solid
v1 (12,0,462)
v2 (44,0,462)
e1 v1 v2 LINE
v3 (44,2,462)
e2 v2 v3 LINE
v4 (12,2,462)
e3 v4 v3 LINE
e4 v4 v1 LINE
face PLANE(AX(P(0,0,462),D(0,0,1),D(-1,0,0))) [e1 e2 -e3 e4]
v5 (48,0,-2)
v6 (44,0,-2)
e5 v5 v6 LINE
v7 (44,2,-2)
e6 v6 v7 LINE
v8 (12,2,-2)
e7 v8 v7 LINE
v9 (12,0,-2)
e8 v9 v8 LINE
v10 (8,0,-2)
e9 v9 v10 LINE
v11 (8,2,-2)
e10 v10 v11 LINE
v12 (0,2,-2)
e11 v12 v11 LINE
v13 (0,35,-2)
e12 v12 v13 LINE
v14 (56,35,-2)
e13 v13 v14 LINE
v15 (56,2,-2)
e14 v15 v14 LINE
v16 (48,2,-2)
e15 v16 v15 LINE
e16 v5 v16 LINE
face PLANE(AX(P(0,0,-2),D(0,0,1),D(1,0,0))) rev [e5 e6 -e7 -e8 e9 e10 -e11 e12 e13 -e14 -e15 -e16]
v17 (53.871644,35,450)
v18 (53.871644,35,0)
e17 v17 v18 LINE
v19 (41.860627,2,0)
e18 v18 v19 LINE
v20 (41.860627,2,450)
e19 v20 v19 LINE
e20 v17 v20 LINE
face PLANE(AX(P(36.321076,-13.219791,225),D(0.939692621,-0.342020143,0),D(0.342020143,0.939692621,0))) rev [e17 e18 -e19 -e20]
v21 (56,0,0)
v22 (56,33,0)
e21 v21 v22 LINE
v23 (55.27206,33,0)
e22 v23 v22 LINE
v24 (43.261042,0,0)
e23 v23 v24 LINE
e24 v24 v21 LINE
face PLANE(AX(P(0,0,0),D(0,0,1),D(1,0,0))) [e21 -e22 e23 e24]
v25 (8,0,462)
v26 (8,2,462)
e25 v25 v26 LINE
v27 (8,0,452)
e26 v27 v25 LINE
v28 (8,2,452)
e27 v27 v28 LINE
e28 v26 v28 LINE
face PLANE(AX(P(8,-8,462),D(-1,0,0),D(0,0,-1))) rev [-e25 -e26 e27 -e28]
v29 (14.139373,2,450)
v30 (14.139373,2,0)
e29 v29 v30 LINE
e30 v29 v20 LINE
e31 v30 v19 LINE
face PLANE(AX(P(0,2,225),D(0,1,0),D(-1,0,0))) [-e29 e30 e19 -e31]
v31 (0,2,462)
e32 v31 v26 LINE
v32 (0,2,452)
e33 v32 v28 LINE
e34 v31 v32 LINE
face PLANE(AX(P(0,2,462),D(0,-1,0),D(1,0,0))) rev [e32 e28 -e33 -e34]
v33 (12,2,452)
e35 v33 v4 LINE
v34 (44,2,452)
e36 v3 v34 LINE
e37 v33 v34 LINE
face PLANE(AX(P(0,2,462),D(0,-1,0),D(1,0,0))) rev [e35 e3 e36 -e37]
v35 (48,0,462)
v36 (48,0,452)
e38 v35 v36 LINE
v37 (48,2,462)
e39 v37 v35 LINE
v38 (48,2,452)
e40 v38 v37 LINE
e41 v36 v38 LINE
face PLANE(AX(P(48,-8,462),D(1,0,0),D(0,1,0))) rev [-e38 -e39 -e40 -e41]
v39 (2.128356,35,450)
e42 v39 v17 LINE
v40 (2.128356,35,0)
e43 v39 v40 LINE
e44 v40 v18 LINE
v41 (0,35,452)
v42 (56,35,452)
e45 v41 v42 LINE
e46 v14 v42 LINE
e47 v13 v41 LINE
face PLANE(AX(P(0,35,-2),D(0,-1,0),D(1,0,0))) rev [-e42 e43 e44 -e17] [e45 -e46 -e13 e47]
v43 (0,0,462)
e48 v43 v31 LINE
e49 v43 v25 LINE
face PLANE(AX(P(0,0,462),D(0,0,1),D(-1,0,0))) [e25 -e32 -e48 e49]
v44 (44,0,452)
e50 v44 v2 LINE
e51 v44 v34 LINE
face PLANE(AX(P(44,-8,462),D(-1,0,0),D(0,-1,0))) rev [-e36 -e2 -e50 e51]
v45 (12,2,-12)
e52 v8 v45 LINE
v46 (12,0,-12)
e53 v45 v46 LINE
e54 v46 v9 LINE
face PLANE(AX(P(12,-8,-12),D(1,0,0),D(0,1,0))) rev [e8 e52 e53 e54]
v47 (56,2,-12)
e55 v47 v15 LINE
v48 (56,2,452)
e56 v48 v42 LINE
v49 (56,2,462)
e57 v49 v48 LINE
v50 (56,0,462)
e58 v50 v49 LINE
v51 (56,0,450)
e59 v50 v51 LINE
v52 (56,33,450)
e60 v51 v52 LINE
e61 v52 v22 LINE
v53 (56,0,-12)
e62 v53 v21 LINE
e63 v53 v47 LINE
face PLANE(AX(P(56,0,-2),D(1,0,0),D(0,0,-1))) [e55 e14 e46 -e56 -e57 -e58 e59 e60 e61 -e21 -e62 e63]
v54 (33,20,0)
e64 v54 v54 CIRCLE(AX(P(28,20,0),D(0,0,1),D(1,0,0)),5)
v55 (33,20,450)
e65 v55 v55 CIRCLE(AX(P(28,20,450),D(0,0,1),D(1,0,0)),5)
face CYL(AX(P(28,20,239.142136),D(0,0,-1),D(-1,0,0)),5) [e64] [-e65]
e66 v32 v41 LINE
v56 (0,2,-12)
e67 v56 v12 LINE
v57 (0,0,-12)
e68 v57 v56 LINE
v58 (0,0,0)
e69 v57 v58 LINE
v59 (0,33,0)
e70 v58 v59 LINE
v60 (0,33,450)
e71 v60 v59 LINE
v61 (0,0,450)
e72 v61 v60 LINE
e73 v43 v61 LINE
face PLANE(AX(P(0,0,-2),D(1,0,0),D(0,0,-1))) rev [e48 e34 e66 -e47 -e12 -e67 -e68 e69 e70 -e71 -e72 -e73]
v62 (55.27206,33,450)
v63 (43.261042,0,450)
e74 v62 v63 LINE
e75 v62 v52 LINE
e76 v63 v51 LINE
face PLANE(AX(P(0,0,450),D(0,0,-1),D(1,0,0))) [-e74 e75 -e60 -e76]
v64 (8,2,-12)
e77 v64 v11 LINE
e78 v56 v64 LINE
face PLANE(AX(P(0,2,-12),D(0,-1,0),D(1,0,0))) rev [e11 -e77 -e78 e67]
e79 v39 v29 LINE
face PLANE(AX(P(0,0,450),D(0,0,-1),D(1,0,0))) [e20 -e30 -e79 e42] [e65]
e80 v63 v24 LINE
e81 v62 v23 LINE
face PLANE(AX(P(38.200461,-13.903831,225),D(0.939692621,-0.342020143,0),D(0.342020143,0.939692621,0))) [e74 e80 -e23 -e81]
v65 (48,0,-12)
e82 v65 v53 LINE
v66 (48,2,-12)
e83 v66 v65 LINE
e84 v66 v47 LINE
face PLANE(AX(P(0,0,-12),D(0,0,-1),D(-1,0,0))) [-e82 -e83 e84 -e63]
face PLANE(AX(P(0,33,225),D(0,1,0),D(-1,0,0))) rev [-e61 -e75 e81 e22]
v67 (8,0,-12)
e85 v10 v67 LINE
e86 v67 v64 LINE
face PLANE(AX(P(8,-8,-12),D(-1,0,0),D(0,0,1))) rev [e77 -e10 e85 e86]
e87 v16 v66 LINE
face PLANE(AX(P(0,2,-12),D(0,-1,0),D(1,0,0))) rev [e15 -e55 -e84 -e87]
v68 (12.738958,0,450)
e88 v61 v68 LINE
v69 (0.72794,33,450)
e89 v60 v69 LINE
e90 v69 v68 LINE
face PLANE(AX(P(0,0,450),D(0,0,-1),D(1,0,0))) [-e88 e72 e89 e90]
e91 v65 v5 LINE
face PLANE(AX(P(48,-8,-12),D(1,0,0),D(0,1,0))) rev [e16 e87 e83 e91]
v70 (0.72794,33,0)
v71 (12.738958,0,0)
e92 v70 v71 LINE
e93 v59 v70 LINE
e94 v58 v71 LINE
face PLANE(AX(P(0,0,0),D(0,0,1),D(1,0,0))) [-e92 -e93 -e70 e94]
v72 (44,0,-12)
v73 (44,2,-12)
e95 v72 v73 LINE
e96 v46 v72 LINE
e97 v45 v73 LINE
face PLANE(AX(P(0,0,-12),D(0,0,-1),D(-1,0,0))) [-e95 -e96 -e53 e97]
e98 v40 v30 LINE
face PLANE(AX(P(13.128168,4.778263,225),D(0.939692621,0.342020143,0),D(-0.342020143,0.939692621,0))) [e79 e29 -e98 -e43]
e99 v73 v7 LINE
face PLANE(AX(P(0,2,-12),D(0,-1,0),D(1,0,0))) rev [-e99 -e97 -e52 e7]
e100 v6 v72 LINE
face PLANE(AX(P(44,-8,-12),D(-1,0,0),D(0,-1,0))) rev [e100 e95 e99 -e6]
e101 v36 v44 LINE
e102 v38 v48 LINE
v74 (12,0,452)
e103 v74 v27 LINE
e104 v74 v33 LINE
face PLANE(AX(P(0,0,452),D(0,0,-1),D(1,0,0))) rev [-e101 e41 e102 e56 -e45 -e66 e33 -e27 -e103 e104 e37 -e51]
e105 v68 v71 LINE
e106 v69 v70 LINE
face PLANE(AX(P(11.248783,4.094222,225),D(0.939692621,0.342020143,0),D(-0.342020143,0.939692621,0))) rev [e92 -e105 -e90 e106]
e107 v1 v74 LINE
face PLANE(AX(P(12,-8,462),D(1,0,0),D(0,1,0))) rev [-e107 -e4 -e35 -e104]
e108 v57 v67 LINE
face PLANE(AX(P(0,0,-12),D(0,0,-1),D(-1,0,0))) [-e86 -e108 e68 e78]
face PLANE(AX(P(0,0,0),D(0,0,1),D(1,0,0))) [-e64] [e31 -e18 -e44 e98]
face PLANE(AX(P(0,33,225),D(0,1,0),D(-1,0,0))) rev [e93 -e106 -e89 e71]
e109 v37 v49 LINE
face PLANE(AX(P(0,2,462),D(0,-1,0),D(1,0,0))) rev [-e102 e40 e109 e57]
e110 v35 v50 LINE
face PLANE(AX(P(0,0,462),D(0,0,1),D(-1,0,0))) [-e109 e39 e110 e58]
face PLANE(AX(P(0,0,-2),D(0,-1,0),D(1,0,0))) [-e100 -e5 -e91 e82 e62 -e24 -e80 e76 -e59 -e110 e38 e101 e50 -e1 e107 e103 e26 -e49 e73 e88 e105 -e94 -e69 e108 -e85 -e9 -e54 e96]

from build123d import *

# Parameters (mm, degrees)
SKETCH_1_W             = 56
SKETCH_1_H             = 35
EXTRUDE_1_DEPTH        = 2
EXTRUDE_2_DEPTH        = 225
EXTRUDE_START          = -12
EXTRUDE_5_DEPTH        = 10
SKETCH_16_R            = 5
EXTRUDE_6_DEPTH        = 225
SKETCH_15_W            = 4
SKETCH_15_H            = 10
CUT_EXTRUDE_1_DEPTH    = 10
MIRROR_START           = 225
MIRROR_1_OUTLINE_R     = 5
MIRROR_1_DEPTH         = 227
MIRROR_START_2         = 450
MIRROR_1_2_OUTLINE_R   = 5
MIRROR_1_2_DEPTH       = 2
MIRROR_START_3         = 452
MIRROR_1_3_OUTLINE_W   = 32
MIRROR_1_3_OUTLINE_H   = 2
MIRROR_1_3_OUTLINE_W_2 = 8
MIRROR_1_3_DEPTH       = 10


# Read off the part's stored shape, not the designer's step: 凸台-拉伸2, 镜向1
with BuildPart() as part:
    # 草图1 (on Front Plane) → 凸台-拉伸1 (new body)
    with BuildSketch(Plane.XY):
        with Locations((28, 17.5)):
            Rectangle(SKETCH_1_W, SKETCH_1_H)
    extrude(amount=-EXTRUDE_1_DEPTH)

    # 凸台-拉伸2 outline → 凸台-拉伸2 (add)
    with BuildSketch(Plane.XY):
        Polygon((0, 35), (0, 33), (0.727940469, 33), (12.738958199, 0), (43.261041801, 0), (55.272059531, 33), (56, 33), (56, 35), (53.871644455, 35), (41.860626724, 2), (14.139373276, 2), (2.128355545, 35), align=None)
    extrude(amount=EXTRUDE_2_DEPTH)

    # 草图1<10> (on Front Plane) → 凸台-拉伸5 (add)
    with BuildSketch(Plane.XY.offset(EXTRUDE_START)):
        Polygon((28, 2), (14.139373276, 2), (14.867313744, 0), (28, 0), align=None)
        Polygon((14.139373276, 2), (12.011017731, 2), (12.738958199, 0), (14.867313744, 0), align=None)
        Polygon((12.738958199, 0), (12.011017731, 2), (0, 2), (0, 0), align=None)
        Polygon((41.860626724, 2), (28, 2), (28, 0), (41.132686256, 0), align=None)
        Polygon((56, 2), (43.988982269, 2), (43.261041801, 0), (56, 0), align=None)
        Polygon((43.988982269, 2), (41.860626724, 2), (41.132686256, 0), (43.261041801, 0), align=None)
    extrude(amount=EXTRUDE_5_DEPTH)

    # 草图16 → 凸台-拉伸6 (add)
    with BuildSketch(Plane.XY):
        with Locations((28, 20)):
            Circle(SKETCH_16_R)
    extrude(amount=EXTRUDE_6_DEPTH)

    # 草图15 → 切除-拉伸1 (cut)
    with BuildSketch(Plane(origin=(0, 2, 0), x_dir=(1, 0, 0), z_dir=(0, 1, 0))):
        with Locations((46, -457)):
            Rectangle(SKETCH_15_W, SKETCH_15_H)
        with Locations((10, 7)):
            Rectangle(SKETCH_15_W, SKETCH_15_H)
        with Locations((46, 7)):
            Rectangle(SKETCH_15_W, SKETCH_15_H)
        with Locations((10, -457)):
            Rectangle(SKETCH_15_W, SKETCH_15_H)
    extrude(amount=-CUT_EXTRUDE_1_DEPTH, mode=Mode.SUBTRACT)

    # 镜向1 outline → 镜向1 (add)
    with BuildSketch(Plane.XY.offset(MIRROR_START)):
        Polygon((43.261041801, 0), (55.272059531, 33), (56, 33), (56, 35), (53.871644455, 35), (41.860626724, 2), (14.139373276, 2), (2.128355545, 35), (0, 35), (0, 33), (0.727940469, 33), (12.738958199, 0), align=None)
        with Locations((28, 20)):
            Circle(MIRROR_1_OUTLINE_R)
    extrude(amount=MIRROR_1_DEPTH)

    # Mirror 1 2 outline → Mirror 1 2 (add)
    # profile 1 of 3: a face of its own
    with BuildSketch(Plane.XY.offset(MIRROR_START_2)):
        Polygon((14.139373276, 2), (41.860626724, 2), (53.871644455, 35), (2.128355545, 35), align=None)
        with Locations((28, 20)):
            Circle(MIRROR_1_2_OUTLINE_R, mode=Mode.SUBTRACT)
    # profile 2 of 3: a face of its own
    with BuildSketch(Plane.XY.offset(MIRROR_START_2)):
        Polygon((55.272059531, 33), (43.261041801, 0), (56, 0), (56, 33), align=None)
    # profile 3 of 3: a face of its own
    with BuildSketch(Plane.XY.offset(MIRROR_START_2)):
        Polygon((12.738958199, 0), (0.727940469, 33), (0, 33), (0, 0), align=None)
    extrude(amount=MIRROR_1_2_DEPTH)

    # Mirror 1 3 outline → Mirror 1 3 (add)
    with BuildSketch(Plane.XY.offset(MIRROR_START_3)):
        with Locations((28, 1)):
            Rectangle(MIRROR_1_3_OUTLINE_W, MIRROR_1_3_OUTLINE_H)
        with Locations((52, 1)):
            Rectangle(MIRROR_1_3_OUTLINE_W_2, MIRROR_1_3_OUTLINE_H)
        with Locations((4, 1)):
            Rectangle(MIRROR_1_3_OUTLINE_W_2, MIRROR_1_3_OUTLINE_H)
    extrude(amount=MIRROR_1_3_DEPTH)


solid = part.part
